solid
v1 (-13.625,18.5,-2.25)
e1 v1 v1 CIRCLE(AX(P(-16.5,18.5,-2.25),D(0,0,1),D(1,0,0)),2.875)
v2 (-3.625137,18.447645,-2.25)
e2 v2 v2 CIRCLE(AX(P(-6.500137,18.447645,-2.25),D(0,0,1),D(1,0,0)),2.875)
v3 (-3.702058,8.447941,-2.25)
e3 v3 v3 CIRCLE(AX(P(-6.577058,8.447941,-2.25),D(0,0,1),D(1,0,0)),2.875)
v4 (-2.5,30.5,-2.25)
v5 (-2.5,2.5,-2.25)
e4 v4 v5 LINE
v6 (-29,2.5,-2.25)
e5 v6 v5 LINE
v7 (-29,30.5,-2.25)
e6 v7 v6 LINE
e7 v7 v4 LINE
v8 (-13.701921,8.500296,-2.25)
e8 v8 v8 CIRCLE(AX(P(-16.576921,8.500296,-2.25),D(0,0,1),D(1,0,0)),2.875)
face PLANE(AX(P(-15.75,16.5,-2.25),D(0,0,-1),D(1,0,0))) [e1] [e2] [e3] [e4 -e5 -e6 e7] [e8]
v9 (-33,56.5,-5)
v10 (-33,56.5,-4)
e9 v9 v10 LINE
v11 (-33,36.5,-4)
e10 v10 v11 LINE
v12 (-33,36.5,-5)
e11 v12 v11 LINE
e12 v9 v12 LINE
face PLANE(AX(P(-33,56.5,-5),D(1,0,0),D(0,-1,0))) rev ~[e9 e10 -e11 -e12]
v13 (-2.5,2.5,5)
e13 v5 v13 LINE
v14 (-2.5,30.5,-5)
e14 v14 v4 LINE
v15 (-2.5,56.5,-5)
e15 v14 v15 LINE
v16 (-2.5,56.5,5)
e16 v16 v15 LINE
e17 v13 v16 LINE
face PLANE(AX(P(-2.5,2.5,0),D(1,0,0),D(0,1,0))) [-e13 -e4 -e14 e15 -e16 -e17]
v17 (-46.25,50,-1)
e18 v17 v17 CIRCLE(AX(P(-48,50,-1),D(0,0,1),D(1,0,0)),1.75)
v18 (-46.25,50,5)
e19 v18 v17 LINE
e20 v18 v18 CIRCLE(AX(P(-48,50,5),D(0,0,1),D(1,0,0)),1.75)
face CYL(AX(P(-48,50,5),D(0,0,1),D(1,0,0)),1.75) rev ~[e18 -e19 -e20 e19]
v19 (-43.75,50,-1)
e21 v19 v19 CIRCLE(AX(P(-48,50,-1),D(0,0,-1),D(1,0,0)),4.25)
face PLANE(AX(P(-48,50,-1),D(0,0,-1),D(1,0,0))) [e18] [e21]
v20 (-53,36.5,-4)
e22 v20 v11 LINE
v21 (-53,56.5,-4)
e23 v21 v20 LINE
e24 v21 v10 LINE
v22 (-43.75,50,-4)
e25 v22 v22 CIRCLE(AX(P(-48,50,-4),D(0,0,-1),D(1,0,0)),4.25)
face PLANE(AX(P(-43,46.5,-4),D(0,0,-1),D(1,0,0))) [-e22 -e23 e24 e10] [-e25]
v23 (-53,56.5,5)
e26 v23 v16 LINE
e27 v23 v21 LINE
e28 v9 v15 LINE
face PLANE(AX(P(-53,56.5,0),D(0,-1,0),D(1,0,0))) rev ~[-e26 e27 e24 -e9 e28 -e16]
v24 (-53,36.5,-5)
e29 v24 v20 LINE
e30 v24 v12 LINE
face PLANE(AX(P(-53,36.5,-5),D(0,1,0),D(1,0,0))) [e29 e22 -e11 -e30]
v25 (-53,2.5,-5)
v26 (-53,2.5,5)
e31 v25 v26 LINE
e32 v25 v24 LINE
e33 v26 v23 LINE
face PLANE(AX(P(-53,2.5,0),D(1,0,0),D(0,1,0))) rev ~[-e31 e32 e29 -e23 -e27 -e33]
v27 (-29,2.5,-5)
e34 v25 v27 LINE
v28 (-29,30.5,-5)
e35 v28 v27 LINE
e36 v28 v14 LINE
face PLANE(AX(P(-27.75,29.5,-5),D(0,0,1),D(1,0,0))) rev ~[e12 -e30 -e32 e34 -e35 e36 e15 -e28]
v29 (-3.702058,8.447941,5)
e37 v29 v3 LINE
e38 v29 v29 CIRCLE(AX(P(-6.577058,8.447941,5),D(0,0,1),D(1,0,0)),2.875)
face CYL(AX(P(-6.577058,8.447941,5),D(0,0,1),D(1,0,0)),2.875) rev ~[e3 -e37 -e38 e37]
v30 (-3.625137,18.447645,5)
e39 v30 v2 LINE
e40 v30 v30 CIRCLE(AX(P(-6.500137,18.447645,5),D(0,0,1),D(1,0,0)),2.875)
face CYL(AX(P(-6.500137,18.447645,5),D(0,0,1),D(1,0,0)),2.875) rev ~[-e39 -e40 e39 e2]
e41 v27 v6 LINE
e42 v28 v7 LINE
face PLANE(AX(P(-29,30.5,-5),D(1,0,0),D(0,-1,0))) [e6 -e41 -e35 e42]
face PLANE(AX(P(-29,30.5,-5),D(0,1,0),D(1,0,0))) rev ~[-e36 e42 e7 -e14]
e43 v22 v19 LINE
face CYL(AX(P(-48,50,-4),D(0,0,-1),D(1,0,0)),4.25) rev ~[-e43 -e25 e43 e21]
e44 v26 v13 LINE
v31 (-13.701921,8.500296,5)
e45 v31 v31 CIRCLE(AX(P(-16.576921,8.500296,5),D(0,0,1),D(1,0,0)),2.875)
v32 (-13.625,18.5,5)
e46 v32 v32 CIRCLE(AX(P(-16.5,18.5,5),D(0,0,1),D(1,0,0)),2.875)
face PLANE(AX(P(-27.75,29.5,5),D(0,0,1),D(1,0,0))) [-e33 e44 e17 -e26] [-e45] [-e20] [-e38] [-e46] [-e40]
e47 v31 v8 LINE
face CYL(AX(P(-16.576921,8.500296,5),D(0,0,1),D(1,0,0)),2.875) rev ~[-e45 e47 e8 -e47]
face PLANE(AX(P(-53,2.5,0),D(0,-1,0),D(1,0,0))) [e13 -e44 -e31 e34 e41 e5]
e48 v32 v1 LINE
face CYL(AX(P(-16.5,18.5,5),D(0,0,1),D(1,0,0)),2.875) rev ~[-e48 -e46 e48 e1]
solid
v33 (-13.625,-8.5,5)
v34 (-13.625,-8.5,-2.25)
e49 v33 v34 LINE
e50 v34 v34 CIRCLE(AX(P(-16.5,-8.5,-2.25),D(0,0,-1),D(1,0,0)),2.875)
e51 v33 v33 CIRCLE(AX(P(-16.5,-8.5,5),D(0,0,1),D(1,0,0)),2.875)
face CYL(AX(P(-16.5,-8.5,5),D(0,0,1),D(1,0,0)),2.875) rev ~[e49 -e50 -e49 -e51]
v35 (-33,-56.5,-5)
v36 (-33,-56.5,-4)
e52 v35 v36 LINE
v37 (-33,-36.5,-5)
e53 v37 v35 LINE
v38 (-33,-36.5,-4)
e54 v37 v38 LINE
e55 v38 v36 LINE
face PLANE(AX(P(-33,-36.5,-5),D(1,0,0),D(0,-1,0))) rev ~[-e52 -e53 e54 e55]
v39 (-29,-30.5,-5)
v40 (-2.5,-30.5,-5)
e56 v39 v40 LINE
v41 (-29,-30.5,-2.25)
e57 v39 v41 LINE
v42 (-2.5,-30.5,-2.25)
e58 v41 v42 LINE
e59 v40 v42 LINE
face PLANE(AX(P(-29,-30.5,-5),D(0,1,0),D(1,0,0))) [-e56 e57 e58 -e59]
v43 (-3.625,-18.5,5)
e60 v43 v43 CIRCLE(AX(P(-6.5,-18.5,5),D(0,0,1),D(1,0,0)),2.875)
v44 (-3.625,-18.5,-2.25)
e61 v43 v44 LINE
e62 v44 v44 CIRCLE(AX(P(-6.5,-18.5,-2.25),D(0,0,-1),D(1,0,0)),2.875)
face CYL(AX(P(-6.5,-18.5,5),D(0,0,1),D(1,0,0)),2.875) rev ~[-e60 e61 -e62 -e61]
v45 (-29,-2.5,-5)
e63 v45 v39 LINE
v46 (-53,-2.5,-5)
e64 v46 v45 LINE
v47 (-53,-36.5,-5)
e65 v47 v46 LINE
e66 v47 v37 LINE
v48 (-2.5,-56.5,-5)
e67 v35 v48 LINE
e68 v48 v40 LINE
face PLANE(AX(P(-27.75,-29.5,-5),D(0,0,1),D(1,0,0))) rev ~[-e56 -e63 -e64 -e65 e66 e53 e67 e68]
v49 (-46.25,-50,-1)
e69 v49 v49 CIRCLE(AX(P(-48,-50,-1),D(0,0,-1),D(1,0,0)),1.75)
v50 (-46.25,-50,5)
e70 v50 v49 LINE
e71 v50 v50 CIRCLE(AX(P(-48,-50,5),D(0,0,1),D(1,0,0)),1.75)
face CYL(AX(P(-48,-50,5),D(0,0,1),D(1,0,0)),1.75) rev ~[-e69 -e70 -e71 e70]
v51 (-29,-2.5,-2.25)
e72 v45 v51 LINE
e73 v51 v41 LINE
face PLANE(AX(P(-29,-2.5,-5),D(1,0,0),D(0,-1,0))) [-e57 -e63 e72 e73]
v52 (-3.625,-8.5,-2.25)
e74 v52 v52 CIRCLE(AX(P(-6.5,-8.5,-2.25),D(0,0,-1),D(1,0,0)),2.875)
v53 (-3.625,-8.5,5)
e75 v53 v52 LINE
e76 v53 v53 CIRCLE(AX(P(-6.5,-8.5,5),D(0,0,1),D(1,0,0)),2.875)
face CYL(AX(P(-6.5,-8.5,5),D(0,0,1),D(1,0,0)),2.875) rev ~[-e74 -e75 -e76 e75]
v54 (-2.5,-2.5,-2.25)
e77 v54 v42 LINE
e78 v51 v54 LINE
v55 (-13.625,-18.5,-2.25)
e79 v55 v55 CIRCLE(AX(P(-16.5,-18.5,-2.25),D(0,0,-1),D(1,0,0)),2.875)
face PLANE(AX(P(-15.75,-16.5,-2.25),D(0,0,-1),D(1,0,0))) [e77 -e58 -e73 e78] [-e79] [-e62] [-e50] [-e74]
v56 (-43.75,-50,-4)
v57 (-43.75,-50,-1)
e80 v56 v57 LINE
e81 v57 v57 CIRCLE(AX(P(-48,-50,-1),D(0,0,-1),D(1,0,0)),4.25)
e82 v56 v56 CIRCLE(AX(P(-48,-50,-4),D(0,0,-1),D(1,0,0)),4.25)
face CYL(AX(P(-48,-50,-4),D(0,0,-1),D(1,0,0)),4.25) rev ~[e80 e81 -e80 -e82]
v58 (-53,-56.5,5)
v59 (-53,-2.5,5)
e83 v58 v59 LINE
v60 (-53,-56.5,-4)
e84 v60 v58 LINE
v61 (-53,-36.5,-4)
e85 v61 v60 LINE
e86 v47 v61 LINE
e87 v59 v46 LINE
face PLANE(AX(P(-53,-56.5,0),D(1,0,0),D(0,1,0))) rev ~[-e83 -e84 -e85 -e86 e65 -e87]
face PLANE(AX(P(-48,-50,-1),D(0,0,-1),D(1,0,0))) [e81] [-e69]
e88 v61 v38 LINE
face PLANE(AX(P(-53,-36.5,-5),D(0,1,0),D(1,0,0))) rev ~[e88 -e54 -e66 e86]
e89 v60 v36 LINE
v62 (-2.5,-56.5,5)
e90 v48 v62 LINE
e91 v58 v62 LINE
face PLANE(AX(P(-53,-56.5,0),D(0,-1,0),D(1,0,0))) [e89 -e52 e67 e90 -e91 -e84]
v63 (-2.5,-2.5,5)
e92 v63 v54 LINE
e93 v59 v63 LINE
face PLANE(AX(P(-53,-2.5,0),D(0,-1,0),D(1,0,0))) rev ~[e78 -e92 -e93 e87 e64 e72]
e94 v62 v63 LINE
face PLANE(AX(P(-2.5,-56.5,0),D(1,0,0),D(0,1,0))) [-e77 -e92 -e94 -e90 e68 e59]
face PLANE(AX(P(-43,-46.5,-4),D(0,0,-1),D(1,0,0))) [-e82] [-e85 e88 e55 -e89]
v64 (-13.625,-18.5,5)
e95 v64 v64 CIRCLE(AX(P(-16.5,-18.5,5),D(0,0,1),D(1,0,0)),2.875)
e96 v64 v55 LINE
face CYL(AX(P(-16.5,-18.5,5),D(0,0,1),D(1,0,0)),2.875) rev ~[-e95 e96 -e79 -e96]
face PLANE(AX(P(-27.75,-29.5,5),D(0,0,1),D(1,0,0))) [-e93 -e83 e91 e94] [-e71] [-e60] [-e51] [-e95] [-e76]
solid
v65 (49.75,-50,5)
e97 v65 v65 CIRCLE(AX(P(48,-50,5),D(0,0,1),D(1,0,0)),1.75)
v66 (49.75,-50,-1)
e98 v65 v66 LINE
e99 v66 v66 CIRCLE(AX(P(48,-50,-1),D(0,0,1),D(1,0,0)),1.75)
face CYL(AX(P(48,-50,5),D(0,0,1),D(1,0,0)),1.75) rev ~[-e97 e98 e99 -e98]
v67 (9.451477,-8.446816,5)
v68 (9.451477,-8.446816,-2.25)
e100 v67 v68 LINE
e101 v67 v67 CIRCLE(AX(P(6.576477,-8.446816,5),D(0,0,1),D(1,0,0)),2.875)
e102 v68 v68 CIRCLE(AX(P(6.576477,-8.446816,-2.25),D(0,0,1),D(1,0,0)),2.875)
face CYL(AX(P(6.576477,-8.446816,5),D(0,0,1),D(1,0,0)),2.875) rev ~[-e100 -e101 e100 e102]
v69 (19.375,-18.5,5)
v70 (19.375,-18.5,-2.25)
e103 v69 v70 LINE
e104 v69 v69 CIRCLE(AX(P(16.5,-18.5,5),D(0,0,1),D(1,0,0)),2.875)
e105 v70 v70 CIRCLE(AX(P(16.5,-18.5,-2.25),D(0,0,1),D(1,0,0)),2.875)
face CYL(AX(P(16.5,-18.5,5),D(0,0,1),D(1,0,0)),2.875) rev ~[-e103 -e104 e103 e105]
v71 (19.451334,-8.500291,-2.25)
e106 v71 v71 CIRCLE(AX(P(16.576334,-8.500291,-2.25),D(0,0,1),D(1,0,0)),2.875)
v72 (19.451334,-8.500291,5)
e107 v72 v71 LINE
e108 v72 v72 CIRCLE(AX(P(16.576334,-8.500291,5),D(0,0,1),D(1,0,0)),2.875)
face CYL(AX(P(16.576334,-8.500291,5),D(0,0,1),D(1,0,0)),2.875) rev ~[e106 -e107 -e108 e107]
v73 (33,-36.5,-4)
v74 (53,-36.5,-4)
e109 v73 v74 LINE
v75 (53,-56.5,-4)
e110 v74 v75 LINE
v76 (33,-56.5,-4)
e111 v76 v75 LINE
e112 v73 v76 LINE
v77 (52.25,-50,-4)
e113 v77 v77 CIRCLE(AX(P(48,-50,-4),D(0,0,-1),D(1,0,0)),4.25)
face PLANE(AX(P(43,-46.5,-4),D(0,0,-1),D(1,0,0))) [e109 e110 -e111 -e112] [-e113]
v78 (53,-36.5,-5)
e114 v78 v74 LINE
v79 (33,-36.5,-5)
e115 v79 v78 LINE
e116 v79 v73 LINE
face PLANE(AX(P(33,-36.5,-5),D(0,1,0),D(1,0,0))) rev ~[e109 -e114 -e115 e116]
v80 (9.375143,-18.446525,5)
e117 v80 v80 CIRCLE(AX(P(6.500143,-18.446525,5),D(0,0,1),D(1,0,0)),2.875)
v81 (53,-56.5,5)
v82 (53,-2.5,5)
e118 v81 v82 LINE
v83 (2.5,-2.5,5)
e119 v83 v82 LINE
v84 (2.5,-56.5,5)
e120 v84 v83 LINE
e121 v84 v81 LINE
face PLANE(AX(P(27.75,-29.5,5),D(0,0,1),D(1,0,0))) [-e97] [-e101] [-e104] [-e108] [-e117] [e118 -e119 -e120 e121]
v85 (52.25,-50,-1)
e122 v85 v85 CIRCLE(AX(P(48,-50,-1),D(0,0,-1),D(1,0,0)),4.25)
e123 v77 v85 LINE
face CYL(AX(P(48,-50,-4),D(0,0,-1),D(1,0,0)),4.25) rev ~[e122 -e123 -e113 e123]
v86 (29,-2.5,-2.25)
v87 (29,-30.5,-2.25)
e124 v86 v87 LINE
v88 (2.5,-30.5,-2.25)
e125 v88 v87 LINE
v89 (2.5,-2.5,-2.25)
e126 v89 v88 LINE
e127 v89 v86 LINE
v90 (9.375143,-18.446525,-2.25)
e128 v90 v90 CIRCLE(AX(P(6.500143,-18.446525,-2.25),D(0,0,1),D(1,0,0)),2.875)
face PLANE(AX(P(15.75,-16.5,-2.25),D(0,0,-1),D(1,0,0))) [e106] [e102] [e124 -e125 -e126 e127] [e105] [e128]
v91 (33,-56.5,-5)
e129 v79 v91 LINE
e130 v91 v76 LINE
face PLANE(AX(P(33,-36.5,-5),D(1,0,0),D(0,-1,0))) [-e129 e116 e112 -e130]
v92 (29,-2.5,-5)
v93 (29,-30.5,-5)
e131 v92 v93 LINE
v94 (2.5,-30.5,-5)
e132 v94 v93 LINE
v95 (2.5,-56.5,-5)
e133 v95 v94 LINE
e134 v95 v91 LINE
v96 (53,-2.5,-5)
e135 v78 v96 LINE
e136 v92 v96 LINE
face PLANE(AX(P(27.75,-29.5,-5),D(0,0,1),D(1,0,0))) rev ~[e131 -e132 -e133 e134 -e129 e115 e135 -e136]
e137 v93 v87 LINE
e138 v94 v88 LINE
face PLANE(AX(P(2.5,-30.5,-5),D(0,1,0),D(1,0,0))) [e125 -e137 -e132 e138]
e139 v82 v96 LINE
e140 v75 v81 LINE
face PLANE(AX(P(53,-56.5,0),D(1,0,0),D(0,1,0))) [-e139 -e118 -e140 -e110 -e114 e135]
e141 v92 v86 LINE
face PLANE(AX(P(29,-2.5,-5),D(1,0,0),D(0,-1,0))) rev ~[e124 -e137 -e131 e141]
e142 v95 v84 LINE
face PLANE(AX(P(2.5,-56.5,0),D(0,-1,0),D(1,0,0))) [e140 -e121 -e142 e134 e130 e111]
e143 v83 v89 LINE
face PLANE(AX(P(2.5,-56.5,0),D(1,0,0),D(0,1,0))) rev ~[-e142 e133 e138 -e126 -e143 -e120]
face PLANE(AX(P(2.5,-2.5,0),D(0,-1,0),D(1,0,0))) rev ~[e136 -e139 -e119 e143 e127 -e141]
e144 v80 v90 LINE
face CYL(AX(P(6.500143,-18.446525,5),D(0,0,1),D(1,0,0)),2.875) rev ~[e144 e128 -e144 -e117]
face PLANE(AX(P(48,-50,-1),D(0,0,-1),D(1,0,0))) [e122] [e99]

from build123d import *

# Parameters (mm, degrees)
F0_W      = 50.5
F0_H      = 54
F1_DEPTH  = 5
F2_R      = 1.75
F3_DEPTH  = 10
F4_R      = 2.875
F5_DEPTH  = 10
F6_W      = 26.5
F6_H      = 28
F6_R      = 2.875
F7_DEPTH  = 2.75
F8_W      = 20
F8_H      = 20
F8_R      = 1.75
F9_DEPTH  = 1
F10_R     = 4.25
F10_R_2   = 1.75
F11_DEPTH = 3


# Not quite as in the source:
# - a feature names something its author has since deleted; it is built from what else it names


with BuildPart() as f1:
    # F0 (on Top) → F1 (new body, symmetric)
    with BuildSketch(Plane.XY):
        with Locations((-27.75, 29.5)):
            Rectangle(F0_W, F0_H)
    extrude(amount=F1_DEPTH, both=True)


with BuildPart() as f1b:
    # F0 (on Top) → F1, piece 2 (new body, symmetric)
    with BuildSketch(Plane.XY):
        with Locations((-27.75, -29.5)):
            Rectangle(F0_W, F0_H)
    extrude(amount=F1_DEPTH, both=True)


with BuildPart() as f1c:
    # F0 (on Top) → F1, piece 3 (new body, symmetric)
    with BuildSketch(Plane.XY):
        with Locations((27.75, -29.5)):
            Rectangle(F0_W, F0_H)
    extrude(amount=F1_DEPTH, both=True)


with BuildPart() as f3_tool:
    # F2 (on face) → F3 (new body)
    with BuildSketch(Plane.XY.offset(5)):
        with Locations((-48, 50)):
            Circle(F2_R)
        with Locations((-48, -50)):
            Circle(F2_R)
        with Locations((48, -50)):
            Circle(F2_R)
    extrude(amount=-F3_DEPTH)


with BuildPart() as f1_1:
    add(f1.part)

    # F3: cut by f3_tool
    add(f3_tool.part, mode=Mode.SUBTRACT)


with BuildPart() as f1b_1:
    add(f1b.part)

    # F3: cut by f3_tool
    add(f3_tool.part, mode=Mode.SUBTRACT)


with BuildPart() as f1c_1:
    add(f1c.part)

    # F3: cut by f3_tool
    add(f3_tool.part, mode=Mode.SUBTRACT)


with BuildPart() as f5_tool:
    # F4 (on face) → F5 (new body)
    with BuildSketch(Plane.XY.offset(5)):
        with Locations((-6.5001370548, 18.4476446966)):
            Circle(F4_R)
        with Locations((-16.5, 18.5)):
            Circle(F4_R)
        with Locations((-16.5769208012, 8.5002958449)):
            Circle(F4_R)
        with Locations((-6.577057856, 8.4479405415)):
            Circle(F4_R)
        with Locations((-6.5, -8.5)):
            Circle(F4_R)
        with Locations((-16.5, -8.5)):
            Circle(F4_R)
        with Locations((-16.5, -18.5)):
            Circle(F4_R)
        with Locations((-6.5, -18.5)):
            Circle(F4_R)
        with Locations((6.5001429807, -18.4465248288)):
            Circle(F4_R)
        with Locations((6.5764766346, -8.4468161744)):
            Circle(F4_R)
        with Locations((16.5763336539, -8.5002913456)):
            Circle(F4_R)
        with Locations((16.5, -18.5)):
            Circle(F4_R)
    extrude(amount=-F5_DEPTH)


with BuildPart() as f1_2:
    add(f1_1.part)

    # F5: cut by f5_tool
    add(f5_tool.part, mode=Mode.SUBTRACT)


with BuildPart() as f1b_2:
    add(f1b_1.part)

    # F5: cut by f5_tool
    add(f5_tool.part, mode=Mode.SUBTRACT)


with BuildPart() as f1c_2:
    add(f1c_1.part)

    # F5: cut by f5_tool
    add(f5_tool.part, mode=Mode.SUBTRACT)


with BuildPart() as f7_tool:
    # F6 (on face) → F7 (new body)
    with BuildSketch(Plane(origin=(0, 0, -5), x_dir=(1, 0, 0), z_dir=(0, 0, -1))):
        with Locations((15.75, 16.5)):
            Rectangle(F6_W, F6_H)
        with Locations((-15.75, -16.5)):
            Rectangle(F6_W, F6_H)
        with Locations((-15.75, 16.5)):
            Rectangle(F6_W, F6_H)
        with Locations((-16.5, 8.5)):
            Circle(F6_R, mode=Mode.SUBTRACT)
        with Locations((-6.5, 8.5)):
            Circle(F6_R, mode=Mode.SUBTRACT)
        with Locations((-16.5, 18.5)):
            Circle(F6_R, mode=Mode.SUBTRACT)
        with Locations((-6.5, 18.5)):
            Circle(F6_R, mode=Mode.SUBTRACT)
    extrude(amount=-F7_DEPTH)


with BuildPart() as f1_3:
    add(f1_2.part)

    # F7: cut by f7_tool
    add(f7_tool.part, mode=Mode.SUBTRACT)


with BuildPart() as f1b_3:
    add(f1b_2.part)

    # F7: cut by f7_tool
    add(f7_tool.part, mode=Mode.SUBTRACT)


with BuildPart() as f1c_3:
    add(f1c_2.part)

    # F7: cut by f7_tool
    add(f7_tool.part, mode=Mode.SUBTRACT)


with BuildPart() as f9_tool:
    # F8 (on face) → F9 (new body)
    with BuildSketch(Plane(origin=(0, 0, -5), x_dir=(1, 0, 0), z_dir=(0, 0, -1))):
        with Locations((-43, -46.5)):
            Rectangle(F8_W, F8_H)
        with Locations((-48, -50)):
            Circle(F8_R, mode=Mode.SUBTRACT)
        with Locations((-43, 46.5)):
            Rectangle(F8_W, F8_H)
        with Locations((43, 46.5)):
            Rectangle(F8_W, F8_H)
    extrude(amount=-F9_DEPTH)


with BuildPart() as f1_4:
    add(f1_3.part)

    # F9: cut by f9_tool
    add(f9_tool.part, mode=Mode.SUBTRACT)


with BuildPart() as f1b_4:
    add(f1b_3.part)

    # F9: cut by f9_tool
    add(f9_tool.part, mode=Mode.SUBTRACT)


with BuildPart() as f1c_4:
    add(f1c_3.part)

    # F9: cut by f9_tool
    add(f9_tool.part, mode=Mode.SUBTRACT)


with BuildPart() as f11_tool:
    # F10 (on face) → F11 (new body)
    with BuildSketch(Plane(origin=(0, 0, -4), x_dir=(1, 0, 0), z_dir=(0, 0, -1))):
        with Locations((-48, 50)):
            Circle(F10_R)
        with Locations((-48, 50)):
            Circle(F10_R_2, mode=Mode.SUBTRACT)
        with Locations((48, 50)):
            Circle(F10_R)
        with Locations((-48, -50)):
            Circle(F10_R)
    extrude(amount=-F11_DEPTH)


with BuildPart() as f1_5:
    add(f1_4.part)

    # F11: cut by f11_tool
    add(f11_tool.part, mode=Mode.SUBTRACT)


with BuildPart() as f1b_5:
    add(f1b_4.part)

    # F11: cut by f11_tool
    add(f11_tool.part, mode=Mode.SUBTRACT)


with BuildPart() as f1c_5:
    add(f1c_4.part)

    # F11: cut by f11_tool
    add(f11_tool.part, mode=Mode.SUBTRACT)


solid = Compound([f1_5.part, f1b_5.part, f1c_5.part])
